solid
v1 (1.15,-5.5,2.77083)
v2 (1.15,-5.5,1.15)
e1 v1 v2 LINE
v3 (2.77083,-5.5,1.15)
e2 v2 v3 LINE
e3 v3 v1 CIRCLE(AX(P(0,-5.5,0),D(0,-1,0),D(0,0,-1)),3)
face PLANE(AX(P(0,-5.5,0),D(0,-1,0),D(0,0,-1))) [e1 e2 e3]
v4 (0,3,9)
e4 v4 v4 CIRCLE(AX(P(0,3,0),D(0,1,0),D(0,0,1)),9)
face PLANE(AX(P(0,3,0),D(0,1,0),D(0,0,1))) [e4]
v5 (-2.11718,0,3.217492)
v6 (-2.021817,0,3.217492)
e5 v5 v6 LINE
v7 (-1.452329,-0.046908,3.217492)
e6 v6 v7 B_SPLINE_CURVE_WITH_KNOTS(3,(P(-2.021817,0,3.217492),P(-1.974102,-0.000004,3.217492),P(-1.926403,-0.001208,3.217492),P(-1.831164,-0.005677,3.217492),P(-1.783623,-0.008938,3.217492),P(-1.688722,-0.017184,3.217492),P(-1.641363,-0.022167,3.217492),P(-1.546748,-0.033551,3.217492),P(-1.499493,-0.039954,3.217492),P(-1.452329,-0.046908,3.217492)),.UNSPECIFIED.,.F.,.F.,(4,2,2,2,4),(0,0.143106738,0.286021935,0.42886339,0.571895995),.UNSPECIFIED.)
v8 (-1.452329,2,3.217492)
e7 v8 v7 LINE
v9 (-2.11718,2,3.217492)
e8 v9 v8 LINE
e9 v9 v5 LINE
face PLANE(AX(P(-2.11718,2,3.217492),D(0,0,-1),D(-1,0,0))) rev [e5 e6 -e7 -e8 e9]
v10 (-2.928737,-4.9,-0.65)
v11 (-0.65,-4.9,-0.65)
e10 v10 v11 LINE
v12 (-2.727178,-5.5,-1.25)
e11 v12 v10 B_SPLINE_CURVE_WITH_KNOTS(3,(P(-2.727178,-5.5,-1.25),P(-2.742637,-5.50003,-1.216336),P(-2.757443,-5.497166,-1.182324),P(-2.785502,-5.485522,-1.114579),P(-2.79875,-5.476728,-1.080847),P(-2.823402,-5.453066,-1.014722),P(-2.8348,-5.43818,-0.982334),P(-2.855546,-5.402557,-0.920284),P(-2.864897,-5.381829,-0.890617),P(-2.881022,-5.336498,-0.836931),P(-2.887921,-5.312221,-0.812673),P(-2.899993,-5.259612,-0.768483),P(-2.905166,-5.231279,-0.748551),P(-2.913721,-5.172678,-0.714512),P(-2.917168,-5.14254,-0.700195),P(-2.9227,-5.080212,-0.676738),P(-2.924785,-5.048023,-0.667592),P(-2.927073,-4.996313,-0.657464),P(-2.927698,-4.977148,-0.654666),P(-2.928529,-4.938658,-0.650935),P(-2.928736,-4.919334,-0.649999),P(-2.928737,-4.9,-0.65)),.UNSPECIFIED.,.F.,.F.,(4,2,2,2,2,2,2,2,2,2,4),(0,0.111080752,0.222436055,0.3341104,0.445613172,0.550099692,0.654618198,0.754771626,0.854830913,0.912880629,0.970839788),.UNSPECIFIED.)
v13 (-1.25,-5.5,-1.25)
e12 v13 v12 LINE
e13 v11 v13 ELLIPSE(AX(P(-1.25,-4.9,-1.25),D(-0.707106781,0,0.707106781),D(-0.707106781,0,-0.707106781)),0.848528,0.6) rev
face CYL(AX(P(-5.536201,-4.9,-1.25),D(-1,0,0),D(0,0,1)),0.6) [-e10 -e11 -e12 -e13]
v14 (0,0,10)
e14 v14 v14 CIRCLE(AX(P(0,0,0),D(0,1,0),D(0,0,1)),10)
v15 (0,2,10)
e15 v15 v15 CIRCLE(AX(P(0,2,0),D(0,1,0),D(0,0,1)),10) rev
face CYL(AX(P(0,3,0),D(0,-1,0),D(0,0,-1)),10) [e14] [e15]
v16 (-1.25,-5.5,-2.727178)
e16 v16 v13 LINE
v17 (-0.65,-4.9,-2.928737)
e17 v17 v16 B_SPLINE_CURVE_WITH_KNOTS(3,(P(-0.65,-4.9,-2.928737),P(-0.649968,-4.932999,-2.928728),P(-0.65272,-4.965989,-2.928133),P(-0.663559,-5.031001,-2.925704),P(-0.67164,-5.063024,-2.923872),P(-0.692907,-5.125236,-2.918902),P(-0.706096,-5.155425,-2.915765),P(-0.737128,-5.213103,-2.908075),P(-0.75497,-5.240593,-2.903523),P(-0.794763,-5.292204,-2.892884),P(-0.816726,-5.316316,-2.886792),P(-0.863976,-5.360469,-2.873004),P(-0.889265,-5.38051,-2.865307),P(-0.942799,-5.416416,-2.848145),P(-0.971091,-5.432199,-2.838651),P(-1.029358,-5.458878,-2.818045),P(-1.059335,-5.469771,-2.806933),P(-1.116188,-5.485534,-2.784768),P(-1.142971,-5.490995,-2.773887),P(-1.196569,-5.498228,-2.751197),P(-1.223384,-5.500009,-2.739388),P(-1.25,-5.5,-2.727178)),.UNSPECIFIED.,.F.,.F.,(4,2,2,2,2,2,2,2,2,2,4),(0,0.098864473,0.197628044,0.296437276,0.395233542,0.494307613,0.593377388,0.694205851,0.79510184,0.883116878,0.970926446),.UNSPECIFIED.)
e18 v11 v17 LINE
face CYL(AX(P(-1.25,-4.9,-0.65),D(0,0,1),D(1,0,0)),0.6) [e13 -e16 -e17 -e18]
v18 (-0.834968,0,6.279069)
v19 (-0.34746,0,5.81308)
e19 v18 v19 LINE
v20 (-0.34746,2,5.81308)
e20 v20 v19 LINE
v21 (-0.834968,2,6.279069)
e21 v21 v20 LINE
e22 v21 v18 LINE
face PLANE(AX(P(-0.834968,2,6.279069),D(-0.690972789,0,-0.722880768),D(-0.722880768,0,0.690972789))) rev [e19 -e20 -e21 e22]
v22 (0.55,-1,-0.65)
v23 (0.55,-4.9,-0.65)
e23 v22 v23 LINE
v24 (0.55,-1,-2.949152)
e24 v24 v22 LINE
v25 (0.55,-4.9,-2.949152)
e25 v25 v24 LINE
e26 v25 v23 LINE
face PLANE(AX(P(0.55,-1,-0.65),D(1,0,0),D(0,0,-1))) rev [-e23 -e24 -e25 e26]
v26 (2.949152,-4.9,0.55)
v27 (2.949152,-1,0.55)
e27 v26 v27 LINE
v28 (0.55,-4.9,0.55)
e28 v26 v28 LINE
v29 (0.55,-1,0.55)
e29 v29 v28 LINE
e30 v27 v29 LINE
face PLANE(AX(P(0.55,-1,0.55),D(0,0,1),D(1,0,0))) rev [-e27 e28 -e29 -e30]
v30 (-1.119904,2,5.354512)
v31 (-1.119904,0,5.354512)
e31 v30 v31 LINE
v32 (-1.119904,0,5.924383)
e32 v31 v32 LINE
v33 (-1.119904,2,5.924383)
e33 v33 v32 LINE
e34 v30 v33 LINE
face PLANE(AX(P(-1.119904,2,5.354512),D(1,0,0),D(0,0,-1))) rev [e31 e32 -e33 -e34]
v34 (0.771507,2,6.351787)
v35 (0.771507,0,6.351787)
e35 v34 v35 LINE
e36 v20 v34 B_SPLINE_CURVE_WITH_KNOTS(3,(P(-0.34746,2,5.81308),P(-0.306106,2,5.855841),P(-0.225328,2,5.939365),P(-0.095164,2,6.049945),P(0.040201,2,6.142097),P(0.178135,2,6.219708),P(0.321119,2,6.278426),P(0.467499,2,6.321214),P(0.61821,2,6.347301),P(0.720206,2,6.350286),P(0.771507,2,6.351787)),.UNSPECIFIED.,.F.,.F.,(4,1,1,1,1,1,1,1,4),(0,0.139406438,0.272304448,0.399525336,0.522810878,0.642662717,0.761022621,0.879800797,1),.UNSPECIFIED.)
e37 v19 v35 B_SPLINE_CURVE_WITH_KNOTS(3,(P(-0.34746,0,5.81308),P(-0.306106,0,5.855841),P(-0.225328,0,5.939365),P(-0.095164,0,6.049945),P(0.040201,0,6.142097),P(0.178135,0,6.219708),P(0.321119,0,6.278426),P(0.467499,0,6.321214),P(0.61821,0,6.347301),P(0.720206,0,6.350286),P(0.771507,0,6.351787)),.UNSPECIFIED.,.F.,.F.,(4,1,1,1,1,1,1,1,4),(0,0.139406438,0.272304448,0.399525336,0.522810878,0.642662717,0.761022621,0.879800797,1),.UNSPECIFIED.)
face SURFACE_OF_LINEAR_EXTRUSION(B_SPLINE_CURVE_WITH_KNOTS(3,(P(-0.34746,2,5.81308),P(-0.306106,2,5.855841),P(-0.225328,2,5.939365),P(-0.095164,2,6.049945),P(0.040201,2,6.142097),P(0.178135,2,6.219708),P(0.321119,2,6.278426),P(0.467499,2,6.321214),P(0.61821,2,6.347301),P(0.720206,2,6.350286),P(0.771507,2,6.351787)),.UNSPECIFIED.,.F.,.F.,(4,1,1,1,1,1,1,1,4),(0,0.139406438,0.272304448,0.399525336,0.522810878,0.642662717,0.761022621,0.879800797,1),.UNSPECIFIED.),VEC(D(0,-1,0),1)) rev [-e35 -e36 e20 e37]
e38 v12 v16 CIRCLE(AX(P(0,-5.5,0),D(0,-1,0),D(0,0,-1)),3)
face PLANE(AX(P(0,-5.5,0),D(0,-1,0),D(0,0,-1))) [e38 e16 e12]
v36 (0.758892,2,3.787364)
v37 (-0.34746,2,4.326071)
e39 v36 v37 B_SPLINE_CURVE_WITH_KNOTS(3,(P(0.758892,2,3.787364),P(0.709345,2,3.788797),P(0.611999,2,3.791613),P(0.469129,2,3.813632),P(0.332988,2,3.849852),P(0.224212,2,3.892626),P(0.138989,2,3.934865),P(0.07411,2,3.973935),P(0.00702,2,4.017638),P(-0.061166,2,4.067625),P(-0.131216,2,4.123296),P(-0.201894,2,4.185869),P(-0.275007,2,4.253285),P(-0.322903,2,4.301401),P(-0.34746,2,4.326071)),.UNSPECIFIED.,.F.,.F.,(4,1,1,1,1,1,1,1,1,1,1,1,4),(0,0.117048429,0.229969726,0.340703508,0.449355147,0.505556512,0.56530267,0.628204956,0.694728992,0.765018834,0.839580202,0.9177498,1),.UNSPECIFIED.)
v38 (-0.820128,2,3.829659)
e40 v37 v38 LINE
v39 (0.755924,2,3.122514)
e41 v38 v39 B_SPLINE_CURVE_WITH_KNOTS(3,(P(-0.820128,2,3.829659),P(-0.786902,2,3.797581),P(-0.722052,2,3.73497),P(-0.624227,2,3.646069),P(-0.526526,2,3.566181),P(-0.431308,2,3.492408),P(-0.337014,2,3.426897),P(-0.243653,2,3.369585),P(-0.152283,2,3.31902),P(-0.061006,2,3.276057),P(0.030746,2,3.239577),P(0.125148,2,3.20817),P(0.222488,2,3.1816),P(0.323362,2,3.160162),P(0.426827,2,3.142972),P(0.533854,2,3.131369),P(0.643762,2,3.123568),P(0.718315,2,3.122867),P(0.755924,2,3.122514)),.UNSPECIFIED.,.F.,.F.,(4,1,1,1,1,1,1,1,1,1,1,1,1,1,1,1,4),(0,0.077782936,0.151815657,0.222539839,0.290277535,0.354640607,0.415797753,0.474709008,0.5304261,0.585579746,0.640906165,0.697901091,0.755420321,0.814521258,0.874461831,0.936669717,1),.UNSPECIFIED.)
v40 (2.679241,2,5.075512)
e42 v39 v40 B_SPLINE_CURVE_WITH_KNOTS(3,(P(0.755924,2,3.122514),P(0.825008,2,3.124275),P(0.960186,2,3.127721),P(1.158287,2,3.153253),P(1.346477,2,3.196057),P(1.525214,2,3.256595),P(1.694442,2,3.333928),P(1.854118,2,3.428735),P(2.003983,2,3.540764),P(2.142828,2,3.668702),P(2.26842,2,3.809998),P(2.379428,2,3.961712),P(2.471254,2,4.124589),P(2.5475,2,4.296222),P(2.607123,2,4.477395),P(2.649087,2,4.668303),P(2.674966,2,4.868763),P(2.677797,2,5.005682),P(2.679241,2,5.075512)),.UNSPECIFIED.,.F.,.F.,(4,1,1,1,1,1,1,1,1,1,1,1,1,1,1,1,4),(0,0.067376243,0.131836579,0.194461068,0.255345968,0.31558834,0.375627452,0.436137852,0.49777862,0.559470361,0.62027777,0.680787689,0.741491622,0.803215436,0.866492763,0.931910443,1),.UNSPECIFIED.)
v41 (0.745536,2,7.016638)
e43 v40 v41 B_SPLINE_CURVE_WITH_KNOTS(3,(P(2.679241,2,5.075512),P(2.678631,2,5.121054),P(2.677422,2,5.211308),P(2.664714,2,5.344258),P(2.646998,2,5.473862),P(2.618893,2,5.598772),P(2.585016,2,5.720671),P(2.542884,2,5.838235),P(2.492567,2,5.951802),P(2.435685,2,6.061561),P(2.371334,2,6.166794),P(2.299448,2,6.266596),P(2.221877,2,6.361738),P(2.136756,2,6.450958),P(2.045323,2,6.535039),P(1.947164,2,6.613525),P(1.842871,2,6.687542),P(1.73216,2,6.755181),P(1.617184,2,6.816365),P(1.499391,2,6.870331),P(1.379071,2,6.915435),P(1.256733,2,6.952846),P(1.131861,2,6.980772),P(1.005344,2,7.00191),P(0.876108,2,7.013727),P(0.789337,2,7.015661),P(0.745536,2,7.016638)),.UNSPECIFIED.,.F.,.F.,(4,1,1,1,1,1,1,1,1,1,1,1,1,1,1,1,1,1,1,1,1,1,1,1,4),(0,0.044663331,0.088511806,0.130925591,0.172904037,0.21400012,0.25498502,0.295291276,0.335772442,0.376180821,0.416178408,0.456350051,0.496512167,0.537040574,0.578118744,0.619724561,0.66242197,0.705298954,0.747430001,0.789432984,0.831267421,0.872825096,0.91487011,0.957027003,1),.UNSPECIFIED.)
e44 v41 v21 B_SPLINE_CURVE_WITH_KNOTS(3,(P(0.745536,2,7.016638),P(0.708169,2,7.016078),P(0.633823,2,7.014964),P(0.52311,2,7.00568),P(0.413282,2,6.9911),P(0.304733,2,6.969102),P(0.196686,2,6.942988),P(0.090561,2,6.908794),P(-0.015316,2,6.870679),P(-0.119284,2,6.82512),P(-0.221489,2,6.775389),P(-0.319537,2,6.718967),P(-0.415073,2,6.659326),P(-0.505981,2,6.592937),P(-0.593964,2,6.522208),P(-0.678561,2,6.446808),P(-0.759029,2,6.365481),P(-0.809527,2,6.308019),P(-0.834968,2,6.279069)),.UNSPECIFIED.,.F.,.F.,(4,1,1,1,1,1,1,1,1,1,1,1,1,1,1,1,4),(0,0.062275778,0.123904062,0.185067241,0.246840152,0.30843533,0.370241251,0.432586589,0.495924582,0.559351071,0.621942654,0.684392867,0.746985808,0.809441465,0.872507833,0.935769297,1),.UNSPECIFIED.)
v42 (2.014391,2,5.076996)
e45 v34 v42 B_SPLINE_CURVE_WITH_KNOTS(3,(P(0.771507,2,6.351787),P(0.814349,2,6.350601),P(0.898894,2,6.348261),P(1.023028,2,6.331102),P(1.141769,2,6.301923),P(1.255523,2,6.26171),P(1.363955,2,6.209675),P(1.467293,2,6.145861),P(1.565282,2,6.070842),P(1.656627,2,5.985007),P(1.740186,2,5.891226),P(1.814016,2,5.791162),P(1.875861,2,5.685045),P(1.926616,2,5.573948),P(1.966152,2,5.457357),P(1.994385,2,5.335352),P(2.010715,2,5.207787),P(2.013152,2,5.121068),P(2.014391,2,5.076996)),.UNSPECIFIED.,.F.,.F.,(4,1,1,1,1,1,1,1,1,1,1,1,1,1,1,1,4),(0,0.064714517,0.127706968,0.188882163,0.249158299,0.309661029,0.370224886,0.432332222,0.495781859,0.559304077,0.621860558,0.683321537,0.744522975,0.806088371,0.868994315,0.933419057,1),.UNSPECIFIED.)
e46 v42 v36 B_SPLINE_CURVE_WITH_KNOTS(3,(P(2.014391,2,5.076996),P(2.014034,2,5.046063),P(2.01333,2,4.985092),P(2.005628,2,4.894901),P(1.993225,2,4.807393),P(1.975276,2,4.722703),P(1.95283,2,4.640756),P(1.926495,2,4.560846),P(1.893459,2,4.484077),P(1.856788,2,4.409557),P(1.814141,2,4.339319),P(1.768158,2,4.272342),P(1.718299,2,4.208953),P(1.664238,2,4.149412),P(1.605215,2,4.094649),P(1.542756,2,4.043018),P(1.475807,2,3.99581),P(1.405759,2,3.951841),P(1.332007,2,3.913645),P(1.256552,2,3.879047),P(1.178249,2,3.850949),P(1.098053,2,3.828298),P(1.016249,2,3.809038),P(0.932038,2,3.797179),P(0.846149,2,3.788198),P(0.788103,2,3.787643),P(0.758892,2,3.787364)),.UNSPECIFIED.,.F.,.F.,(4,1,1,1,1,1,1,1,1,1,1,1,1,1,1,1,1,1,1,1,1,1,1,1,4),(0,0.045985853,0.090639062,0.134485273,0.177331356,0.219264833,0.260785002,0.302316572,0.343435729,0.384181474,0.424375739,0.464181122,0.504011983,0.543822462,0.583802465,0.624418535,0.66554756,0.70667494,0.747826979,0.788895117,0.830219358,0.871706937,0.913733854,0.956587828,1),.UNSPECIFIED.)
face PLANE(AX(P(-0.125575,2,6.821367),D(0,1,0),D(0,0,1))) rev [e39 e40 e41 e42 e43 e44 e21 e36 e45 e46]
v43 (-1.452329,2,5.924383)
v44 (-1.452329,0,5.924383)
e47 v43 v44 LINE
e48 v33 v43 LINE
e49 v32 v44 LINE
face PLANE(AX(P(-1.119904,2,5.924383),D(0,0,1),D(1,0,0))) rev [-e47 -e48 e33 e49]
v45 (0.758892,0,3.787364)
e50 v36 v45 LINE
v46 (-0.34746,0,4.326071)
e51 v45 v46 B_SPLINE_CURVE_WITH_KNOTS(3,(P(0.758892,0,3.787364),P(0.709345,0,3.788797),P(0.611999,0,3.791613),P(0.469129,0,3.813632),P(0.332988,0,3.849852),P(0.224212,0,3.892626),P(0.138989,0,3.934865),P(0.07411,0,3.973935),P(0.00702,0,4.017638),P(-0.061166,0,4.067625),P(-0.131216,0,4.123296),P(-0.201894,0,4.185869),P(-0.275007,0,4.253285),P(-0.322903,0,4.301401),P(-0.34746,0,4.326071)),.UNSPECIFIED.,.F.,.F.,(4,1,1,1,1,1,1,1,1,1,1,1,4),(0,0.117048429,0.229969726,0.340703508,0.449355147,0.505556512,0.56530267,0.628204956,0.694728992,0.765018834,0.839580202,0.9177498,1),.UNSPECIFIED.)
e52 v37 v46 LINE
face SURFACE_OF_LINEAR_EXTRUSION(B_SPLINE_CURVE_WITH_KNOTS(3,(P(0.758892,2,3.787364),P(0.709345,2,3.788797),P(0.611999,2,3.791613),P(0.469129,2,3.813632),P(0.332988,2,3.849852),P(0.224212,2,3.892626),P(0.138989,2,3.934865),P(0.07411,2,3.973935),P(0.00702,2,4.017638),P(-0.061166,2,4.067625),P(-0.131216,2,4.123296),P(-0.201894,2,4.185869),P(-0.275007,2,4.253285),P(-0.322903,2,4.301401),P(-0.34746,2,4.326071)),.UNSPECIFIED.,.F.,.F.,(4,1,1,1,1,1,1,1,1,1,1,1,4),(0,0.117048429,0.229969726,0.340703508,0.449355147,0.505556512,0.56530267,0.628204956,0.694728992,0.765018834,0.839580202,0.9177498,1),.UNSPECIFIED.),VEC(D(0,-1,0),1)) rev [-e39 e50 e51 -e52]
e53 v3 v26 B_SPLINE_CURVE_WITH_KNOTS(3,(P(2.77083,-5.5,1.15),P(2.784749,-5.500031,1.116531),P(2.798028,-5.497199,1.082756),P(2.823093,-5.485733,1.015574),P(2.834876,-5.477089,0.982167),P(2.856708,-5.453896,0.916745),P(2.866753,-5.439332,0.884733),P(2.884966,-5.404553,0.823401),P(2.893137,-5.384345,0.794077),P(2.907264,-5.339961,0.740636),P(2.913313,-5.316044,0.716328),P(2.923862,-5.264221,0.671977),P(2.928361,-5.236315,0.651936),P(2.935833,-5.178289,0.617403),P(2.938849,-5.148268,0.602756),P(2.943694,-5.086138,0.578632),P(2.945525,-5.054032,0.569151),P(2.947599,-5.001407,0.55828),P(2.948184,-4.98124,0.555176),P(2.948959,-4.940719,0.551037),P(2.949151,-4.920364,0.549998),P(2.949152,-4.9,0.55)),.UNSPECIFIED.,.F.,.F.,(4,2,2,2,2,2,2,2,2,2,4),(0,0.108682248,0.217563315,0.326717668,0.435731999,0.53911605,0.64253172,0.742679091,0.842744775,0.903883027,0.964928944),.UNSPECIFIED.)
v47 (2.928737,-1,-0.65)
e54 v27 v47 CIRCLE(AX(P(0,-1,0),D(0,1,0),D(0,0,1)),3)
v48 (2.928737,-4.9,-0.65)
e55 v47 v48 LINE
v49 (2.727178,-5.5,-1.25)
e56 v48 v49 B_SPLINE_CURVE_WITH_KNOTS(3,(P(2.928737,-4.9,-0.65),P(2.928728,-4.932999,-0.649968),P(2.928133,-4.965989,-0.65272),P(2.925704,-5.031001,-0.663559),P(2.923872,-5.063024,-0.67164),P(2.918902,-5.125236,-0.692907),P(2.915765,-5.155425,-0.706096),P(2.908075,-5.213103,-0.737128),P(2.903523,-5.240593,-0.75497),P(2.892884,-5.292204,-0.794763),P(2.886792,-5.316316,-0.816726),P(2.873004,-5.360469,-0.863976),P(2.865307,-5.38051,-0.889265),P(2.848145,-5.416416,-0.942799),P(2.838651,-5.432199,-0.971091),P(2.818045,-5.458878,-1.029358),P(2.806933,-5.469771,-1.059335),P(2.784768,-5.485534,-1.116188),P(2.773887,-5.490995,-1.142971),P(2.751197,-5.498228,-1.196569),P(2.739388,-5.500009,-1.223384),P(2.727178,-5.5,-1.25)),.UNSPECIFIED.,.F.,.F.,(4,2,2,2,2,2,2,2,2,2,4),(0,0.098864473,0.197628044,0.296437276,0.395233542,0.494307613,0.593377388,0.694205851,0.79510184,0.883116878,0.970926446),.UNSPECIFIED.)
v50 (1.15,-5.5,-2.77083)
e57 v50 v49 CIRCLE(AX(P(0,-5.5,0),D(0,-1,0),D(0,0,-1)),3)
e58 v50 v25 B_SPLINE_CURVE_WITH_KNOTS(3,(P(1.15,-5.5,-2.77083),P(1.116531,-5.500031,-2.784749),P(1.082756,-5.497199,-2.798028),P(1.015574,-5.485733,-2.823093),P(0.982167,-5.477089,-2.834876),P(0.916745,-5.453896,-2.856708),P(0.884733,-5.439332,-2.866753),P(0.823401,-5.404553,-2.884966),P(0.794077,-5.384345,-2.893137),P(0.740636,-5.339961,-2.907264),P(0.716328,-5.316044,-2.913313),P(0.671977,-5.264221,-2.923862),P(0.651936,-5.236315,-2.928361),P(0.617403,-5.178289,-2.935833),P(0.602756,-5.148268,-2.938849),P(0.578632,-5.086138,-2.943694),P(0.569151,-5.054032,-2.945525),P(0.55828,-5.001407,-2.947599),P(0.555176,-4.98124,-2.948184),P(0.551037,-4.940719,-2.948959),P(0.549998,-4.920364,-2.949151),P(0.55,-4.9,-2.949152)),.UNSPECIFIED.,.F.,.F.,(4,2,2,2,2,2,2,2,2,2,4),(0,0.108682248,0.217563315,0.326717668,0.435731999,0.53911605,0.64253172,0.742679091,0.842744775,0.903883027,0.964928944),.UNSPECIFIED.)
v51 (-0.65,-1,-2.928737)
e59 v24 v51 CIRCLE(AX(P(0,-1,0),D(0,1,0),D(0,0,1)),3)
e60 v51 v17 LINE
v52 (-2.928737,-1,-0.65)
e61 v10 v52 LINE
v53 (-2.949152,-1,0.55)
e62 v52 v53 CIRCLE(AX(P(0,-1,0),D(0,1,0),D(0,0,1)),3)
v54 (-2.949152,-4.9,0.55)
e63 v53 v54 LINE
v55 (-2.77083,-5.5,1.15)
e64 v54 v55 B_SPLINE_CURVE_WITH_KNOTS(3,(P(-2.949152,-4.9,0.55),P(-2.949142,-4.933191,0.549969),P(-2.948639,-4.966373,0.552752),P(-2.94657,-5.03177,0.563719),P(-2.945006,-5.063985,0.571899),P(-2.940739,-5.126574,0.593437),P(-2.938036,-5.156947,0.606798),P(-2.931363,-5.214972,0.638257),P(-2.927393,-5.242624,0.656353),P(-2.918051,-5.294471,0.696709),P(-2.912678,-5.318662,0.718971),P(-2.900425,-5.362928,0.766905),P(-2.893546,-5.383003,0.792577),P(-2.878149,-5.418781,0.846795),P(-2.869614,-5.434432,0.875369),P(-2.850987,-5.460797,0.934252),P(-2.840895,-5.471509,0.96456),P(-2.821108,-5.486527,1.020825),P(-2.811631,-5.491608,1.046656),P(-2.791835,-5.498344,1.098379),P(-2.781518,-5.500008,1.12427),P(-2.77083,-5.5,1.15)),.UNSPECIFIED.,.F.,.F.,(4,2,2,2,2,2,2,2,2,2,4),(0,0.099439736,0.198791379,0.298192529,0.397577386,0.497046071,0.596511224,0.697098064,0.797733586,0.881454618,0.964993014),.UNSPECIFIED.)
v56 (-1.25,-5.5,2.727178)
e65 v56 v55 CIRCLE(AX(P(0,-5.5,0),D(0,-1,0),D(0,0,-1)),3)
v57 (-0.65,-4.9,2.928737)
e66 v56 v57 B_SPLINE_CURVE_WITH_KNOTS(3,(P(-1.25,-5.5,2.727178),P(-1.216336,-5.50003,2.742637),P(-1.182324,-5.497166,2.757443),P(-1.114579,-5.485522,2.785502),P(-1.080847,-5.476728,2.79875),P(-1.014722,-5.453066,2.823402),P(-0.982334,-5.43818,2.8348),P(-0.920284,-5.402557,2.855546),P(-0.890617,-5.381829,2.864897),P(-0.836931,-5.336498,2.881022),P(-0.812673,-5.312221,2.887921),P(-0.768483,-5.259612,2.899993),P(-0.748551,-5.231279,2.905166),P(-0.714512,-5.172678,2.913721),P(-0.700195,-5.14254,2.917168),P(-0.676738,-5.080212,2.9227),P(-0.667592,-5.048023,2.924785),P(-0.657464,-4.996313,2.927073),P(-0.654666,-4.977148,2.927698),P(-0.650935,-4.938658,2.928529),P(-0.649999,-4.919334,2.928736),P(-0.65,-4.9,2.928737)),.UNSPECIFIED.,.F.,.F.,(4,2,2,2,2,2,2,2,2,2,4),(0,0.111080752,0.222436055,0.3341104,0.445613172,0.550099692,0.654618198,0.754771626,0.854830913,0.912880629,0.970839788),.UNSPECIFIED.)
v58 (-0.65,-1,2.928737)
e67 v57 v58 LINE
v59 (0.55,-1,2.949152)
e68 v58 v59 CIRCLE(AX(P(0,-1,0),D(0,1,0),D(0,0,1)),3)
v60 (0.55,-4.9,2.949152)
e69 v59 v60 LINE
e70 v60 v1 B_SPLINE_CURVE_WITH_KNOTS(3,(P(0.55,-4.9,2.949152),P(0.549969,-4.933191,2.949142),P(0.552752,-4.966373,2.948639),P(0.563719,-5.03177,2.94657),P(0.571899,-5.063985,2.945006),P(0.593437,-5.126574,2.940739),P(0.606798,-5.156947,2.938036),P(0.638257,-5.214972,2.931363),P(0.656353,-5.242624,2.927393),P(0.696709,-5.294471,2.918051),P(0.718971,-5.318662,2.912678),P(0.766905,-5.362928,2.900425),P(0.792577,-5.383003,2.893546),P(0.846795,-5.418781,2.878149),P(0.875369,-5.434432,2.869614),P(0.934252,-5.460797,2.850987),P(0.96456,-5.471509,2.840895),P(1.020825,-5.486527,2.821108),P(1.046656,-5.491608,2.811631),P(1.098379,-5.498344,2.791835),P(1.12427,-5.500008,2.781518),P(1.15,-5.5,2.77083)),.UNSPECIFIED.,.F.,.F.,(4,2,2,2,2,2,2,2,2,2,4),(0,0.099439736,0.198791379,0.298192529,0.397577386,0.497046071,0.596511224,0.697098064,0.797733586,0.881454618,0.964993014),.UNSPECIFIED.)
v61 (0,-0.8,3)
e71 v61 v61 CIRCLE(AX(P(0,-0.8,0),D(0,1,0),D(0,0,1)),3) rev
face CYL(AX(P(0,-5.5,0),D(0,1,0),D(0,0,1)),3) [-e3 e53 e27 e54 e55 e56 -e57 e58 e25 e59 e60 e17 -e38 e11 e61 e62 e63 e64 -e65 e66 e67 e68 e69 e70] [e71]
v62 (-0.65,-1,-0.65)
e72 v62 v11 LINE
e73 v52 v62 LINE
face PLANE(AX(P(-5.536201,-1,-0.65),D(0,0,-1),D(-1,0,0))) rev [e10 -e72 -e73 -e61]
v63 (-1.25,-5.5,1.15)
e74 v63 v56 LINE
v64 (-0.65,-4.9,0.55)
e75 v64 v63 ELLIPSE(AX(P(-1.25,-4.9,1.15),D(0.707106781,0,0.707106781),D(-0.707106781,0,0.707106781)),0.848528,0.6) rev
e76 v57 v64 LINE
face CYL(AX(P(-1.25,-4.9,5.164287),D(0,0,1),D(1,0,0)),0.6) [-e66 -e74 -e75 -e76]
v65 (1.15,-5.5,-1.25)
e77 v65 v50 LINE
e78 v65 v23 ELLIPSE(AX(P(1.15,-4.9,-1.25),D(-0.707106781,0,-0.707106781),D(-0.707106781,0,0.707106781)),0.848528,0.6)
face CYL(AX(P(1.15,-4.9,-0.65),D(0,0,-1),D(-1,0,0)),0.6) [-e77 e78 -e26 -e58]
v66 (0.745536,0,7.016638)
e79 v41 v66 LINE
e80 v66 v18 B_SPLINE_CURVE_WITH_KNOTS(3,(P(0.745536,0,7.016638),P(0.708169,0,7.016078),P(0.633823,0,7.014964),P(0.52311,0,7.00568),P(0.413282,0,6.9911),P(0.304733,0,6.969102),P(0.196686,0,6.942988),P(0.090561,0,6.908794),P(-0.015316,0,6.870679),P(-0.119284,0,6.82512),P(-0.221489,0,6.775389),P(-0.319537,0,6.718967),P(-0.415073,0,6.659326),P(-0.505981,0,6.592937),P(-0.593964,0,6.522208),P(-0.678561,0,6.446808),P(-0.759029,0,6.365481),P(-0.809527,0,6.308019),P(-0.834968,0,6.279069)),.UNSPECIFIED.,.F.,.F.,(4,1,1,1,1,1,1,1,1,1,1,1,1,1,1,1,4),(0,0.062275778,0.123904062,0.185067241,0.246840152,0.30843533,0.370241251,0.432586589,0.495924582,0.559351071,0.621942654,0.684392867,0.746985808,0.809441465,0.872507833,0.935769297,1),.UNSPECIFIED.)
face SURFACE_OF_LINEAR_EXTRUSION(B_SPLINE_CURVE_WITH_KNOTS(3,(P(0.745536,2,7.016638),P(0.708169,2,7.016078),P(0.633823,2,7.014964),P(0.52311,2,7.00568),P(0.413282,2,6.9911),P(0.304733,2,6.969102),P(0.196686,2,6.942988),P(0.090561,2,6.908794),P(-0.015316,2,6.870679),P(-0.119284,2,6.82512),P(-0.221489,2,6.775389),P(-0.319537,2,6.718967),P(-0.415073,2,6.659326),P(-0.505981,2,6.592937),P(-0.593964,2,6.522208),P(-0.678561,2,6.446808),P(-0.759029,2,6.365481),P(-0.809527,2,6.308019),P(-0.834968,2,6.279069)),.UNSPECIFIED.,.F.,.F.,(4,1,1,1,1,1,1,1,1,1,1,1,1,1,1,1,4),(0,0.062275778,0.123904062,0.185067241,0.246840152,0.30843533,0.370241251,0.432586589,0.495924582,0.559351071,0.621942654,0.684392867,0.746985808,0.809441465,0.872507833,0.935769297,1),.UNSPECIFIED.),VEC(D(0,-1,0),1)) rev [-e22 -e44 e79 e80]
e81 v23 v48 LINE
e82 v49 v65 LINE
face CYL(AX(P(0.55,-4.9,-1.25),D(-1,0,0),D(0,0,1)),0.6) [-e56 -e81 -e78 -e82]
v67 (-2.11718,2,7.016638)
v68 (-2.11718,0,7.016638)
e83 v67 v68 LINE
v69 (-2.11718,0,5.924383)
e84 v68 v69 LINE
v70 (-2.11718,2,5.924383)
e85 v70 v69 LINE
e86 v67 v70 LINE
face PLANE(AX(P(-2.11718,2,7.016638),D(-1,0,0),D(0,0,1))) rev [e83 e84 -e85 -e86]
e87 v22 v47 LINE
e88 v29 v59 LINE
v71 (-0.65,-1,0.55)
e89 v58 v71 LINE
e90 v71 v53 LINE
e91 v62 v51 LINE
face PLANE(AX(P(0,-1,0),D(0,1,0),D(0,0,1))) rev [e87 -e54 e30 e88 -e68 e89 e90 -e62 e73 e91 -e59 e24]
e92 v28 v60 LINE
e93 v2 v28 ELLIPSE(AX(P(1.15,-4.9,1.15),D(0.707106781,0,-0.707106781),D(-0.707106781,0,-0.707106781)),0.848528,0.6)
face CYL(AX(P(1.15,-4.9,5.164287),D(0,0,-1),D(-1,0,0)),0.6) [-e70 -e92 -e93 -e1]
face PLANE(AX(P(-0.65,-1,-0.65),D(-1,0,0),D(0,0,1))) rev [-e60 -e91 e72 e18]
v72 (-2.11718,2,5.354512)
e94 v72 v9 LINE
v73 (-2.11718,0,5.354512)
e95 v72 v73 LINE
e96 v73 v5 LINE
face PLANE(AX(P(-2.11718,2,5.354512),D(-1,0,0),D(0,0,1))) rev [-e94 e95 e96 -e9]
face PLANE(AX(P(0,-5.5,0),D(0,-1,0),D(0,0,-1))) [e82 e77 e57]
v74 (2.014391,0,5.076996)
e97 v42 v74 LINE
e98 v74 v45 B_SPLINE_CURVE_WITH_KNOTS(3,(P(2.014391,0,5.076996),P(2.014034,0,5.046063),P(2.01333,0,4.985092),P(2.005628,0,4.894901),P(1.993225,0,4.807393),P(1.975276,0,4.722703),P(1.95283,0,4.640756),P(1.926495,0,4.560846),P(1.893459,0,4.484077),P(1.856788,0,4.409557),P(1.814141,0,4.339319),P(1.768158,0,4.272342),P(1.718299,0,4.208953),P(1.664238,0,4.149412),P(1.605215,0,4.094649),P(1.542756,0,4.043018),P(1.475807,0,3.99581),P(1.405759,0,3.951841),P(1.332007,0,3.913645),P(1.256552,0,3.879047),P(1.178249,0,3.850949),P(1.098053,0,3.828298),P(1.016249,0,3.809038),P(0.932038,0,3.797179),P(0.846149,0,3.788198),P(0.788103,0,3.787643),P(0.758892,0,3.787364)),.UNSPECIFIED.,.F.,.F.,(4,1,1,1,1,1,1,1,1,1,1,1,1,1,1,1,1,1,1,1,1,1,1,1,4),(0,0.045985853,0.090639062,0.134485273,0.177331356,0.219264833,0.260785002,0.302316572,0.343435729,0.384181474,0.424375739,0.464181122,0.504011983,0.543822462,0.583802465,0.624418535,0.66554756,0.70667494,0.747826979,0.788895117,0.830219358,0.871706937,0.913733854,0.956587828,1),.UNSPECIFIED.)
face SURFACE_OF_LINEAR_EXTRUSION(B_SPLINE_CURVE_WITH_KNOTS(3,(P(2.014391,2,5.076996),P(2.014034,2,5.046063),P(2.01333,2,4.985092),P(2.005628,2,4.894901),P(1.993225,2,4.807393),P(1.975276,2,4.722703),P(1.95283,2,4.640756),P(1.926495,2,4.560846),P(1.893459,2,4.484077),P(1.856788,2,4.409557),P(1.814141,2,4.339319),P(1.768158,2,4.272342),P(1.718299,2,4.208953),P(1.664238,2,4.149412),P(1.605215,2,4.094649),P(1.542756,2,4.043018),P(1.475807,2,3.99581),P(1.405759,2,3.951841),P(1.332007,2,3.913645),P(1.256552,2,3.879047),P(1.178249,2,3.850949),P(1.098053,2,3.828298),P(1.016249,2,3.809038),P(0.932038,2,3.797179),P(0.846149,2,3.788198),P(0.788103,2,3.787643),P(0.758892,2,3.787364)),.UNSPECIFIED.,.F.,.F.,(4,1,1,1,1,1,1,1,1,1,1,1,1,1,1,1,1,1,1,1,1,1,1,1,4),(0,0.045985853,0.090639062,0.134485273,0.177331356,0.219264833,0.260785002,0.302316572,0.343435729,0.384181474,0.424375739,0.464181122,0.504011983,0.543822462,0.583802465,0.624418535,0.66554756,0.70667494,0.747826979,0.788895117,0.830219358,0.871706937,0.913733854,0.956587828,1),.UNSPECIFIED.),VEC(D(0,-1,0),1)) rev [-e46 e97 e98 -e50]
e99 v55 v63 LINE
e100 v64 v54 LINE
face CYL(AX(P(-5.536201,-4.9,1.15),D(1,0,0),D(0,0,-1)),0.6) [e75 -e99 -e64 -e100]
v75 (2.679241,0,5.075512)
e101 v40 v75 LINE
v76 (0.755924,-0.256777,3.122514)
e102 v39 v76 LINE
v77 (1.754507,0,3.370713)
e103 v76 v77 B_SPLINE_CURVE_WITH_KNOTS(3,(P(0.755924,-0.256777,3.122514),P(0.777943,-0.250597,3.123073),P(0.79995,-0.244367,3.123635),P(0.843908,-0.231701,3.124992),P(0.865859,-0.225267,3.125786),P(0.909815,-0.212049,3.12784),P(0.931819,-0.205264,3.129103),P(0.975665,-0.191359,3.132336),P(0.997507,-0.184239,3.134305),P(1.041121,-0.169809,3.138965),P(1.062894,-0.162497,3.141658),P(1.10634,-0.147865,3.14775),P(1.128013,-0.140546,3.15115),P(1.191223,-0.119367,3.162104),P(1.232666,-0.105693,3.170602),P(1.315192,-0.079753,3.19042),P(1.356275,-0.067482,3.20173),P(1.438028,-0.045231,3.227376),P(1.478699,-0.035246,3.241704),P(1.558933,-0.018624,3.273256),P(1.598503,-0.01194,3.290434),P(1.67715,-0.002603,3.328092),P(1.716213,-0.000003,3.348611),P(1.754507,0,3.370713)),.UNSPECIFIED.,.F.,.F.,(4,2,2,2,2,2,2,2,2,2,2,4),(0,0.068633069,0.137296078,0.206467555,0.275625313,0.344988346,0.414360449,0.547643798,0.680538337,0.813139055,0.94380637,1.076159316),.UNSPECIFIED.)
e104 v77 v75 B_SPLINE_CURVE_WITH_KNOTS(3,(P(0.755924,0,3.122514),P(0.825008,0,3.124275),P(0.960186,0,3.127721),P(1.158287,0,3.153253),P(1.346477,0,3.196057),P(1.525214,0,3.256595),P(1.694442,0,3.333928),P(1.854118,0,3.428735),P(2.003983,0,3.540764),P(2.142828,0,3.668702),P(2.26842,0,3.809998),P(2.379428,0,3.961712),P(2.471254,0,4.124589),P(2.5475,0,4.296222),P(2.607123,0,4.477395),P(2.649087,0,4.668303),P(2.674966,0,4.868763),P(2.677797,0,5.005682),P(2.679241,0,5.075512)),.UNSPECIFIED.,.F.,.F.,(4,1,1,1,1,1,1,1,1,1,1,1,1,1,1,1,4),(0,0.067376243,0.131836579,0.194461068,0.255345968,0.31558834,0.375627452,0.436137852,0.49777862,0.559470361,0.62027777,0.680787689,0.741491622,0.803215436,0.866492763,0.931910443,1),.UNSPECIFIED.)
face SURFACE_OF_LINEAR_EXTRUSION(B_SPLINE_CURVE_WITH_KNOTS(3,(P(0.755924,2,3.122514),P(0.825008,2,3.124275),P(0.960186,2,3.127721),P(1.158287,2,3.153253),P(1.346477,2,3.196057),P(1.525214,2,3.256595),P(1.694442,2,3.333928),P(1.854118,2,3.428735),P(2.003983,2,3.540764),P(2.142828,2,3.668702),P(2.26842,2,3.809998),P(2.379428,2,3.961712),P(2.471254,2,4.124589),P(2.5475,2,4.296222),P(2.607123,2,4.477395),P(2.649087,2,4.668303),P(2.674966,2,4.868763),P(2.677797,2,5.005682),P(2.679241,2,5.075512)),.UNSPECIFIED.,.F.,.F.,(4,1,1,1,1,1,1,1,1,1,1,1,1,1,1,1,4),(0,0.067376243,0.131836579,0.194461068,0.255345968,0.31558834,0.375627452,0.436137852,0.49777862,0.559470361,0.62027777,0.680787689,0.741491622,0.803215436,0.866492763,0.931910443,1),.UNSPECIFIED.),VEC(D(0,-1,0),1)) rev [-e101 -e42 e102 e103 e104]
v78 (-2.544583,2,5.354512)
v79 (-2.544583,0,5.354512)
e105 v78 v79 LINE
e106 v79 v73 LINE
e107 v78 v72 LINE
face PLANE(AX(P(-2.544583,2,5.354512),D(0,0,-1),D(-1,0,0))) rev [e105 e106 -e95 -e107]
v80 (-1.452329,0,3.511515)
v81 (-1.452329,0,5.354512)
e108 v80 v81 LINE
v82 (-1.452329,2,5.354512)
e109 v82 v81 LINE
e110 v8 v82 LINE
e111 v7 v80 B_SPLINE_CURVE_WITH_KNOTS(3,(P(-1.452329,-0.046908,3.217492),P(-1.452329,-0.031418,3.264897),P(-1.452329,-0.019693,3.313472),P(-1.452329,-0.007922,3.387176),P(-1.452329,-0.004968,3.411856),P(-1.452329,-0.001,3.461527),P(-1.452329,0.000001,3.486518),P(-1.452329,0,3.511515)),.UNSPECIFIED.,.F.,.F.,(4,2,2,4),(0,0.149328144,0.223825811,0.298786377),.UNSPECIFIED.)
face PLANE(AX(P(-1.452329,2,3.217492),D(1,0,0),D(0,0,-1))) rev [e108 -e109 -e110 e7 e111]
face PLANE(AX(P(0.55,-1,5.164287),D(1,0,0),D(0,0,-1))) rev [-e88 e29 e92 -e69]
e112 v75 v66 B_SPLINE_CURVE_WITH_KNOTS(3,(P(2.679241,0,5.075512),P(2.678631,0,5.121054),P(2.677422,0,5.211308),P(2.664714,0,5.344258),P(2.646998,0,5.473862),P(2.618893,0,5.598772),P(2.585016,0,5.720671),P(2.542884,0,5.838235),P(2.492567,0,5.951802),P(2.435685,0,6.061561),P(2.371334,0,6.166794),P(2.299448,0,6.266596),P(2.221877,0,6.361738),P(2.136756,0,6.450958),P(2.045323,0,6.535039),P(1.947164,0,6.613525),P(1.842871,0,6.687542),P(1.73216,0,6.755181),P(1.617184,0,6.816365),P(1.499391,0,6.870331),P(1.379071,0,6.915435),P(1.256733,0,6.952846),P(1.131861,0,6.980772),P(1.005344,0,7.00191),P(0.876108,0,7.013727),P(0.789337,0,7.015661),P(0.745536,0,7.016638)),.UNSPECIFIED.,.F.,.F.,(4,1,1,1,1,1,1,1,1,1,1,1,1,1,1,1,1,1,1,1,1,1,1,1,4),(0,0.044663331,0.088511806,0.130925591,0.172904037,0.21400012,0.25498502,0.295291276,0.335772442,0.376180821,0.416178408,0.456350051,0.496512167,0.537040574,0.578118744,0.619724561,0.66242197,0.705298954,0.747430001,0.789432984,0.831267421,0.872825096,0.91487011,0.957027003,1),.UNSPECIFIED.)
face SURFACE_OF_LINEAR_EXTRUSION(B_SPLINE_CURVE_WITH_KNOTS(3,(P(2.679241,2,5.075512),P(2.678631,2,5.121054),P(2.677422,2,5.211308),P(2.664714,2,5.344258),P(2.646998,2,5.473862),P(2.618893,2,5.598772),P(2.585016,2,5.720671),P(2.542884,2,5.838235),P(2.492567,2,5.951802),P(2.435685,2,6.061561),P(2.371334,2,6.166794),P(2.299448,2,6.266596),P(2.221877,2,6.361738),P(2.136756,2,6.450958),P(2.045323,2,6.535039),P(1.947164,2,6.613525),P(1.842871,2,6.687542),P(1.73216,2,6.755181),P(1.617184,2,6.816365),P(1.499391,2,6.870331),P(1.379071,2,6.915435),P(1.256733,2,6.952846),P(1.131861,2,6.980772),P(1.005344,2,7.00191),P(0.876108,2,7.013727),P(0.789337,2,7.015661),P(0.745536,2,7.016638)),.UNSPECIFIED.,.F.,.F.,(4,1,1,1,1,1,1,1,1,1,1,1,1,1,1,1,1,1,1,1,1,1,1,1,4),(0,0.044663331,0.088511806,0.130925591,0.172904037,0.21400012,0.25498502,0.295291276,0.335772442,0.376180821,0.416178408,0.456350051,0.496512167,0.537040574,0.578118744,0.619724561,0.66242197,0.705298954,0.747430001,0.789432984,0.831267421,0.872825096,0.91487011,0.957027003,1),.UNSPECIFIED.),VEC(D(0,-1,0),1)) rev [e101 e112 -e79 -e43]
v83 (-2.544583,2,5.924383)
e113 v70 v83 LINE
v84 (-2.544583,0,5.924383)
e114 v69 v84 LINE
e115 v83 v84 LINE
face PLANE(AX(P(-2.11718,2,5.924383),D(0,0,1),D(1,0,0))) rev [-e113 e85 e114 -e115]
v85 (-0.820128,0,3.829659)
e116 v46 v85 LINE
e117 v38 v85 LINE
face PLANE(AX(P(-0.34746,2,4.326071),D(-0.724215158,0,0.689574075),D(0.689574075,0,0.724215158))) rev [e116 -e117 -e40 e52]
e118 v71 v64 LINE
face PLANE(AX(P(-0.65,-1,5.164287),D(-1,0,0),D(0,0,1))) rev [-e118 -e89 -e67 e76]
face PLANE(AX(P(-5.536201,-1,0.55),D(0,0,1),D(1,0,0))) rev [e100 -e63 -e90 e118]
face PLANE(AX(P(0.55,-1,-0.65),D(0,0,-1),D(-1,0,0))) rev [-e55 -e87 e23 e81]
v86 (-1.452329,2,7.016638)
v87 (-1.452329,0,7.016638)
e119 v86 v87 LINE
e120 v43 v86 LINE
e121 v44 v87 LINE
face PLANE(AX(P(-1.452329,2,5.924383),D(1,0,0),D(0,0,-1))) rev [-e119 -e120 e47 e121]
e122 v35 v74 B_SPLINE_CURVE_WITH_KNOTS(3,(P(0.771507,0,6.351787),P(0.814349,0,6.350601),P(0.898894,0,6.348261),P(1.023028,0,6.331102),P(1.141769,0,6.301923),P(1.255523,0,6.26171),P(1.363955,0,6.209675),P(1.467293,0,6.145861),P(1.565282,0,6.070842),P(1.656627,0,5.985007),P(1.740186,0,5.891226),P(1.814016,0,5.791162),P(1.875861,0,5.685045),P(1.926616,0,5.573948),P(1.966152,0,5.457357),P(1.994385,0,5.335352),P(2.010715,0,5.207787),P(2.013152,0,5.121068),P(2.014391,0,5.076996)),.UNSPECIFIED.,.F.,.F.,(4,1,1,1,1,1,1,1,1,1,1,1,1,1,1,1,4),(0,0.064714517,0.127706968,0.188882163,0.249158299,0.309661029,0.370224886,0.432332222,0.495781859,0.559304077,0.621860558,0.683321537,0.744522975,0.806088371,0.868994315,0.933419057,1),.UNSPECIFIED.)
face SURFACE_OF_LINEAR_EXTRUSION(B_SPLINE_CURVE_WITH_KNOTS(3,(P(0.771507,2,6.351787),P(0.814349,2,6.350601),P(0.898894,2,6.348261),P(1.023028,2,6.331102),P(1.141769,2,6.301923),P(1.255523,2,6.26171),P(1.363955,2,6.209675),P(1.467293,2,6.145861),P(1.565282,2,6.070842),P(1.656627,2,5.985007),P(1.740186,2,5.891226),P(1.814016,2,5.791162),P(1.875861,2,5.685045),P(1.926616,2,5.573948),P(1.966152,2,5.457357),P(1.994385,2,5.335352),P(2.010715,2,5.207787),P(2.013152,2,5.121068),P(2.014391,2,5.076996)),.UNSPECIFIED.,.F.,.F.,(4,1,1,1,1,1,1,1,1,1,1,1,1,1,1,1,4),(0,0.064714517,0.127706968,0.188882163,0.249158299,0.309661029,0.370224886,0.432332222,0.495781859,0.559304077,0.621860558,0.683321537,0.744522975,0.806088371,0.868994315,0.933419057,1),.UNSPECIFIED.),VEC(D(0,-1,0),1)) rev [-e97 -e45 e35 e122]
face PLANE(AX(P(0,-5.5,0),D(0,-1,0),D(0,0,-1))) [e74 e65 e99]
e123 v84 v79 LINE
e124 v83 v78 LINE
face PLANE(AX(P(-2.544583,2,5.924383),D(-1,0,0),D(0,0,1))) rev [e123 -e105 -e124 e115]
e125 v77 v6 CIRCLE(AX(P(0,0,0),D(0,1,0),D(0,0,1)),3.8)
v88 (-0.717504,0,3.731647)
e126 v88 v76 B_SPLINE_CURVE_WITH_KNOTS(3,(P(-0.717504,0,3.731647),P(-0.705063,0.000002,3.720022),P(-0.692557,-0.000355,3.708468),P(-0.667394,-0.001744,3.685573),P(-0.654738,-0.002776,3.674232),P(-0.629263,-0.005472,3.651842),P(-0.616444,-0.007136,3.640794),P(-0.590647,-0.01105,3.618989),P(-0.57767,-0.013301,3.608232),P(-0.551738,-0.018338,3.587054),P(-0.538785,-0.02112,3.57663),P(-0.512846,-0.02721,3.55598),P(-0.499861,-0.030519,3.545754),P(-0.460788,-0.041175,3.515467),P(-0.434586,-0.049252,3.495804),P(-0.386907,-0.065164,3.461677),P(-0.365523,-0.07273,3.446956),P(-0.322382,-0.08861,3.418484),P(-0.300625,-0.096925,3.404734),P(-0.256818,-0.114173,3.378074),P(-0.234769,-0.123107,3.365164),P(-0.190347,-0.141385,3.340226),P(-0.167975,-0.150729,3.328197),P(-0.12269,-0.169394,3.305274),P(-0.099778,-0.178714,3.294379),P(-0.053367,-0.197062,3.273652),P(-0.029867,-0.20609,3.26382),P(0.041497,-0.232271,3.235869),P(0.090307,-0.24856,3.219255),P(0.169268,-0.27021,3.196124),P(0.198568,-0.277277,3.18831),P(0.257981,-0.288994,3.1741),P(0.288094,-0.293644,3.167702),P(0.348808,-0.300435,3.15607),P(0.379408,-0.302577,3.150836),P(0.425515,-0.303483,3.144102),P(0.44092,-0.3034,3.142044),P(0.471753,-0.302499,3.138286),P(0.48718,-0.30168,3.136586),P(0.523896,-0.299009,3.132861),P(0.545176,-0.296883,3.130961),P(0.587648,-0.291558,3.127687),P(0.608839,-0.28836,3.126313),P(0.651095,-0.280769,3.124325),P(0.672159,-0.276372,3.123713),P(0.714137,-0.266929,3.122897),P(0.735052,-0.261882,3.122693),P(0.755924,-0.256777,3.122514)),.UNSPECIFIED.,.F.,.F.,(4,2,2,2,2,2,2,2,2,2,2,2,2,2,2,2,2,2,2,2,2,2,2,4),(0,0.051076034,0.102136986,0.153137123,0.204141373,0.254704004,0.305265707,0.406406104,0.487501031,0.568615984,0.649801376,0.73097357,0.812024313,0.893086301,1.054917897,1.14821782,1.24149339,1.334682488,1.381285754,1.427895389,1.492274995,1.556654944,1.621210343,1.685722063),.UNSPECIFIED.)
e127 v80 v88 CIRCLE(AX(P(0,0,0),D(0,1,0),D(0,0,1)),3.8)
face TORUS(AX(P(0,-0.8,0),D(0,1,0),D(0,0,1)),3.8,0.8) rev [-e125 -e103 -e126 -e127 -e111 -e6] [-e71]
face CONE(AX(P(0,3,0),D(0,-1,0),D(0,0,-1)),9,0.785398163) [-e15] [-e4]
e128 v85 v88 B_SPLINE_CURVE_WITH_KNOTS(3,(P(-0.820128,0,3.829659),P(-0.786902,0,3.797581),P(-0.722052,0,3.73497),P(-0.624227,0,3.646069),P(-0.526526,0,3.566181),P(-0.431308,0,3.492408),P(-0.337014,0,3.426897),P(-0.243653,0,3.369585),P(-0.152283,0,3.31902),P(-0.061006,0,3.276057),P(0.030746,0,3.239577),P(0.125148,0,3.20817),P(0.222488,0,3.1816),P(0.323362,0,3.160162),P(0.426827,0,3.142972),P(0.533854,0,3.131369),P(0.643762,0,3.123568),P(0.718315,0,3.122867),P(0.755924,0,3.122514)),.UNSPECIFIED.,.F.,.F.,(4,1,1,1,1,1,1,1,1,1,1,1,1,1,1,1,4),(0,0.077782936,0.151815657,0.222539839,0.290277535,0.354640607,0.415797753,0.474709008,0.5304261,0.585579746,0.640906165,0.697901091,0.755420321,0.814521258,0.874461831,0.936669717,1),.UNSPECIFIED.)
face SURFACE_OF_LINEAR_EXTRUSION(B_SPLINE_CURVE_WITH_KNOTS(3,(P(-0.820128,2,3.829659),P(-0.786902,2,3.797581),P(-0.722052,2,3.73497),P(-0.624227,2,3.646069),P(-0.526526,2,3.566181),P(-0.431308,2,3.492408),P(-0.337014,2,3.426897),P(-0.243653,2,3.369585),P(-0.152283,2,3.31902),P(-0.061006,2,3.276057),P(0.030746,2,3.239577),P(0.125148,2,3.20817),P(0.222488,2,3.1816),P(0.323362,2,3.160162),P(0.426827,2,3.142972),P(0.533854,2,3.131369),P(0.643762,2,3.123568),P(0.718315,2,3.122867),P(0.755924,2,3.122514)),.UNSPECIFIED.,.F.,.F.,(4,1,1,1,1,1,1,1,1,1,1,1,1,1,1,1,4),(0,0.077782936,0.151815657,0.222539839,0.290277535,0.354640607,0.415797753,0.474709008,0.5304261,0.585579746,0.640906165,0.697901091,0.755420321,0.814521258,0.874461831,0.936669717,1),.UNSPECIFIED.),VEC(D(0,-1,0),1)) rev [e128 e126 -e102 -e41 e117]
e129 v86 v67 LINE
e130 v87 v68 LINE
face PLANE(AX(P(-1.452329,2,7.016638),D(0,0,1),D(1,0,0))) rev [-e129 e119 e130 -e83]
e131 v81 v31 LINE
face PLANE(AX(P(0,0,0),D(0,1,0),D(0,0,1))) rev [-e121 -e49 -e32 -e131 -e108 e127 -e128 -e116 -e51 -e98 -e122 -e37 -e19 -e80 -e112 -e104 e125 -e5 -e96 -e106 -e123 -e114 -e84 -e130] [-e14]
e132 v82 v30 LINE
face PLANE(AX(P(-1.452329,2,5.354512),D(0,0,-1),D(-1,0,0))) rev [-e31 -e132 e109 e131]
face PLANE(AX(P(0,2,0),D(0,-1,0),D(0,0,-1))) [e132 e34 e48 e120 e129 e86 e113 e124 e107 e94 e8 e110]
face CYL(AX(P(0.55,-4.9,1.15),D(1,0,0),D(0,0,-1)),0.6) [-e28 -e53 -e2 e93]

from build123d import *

# Parameters (mm, degrees)
SKETCH1_R           = 10
BOSS_EXTRUDE1_DEPTH = 3
SKETCH2_R           = 3
BOSS_EXTRUDE2_DEPTH = 5.5
CUT_EXTRUDE1_DEPTH  = 4.5
CUT_EXTRUDE2_DEPTH  = 2
FILLET3_R           = 0.6
CHAMFER1_SIZE       = 1
FILLET4_START       = -0.303359817
FILLET4_2_DEPTH     = 0.303359817


with BuildPart() as part:
    # Sketch1 → Boss-Extrude1 (new body)
    with BuildSketch(Plane(origin=(0, 0, 0), x_dir=(1, 0, 0), z_dir=(0, 1, 0))):
        with Locations(Location((0, 0, 0), (0, 0, 270))):
            Circle(SKETCH1_R)
    extrude(amount=BOSS_EXTRUDE1_DEPTH)

    # Sketch2 → Boss-Extrude2 (add)
    with BuildSketch(Plane.XZ):
        with Locations(Location((0, 0, 0), (0, 0, 90))):
            Circle(SKETCH2_R)
    extrude(amount=BOSS_EXTRUDE2_DEPTH)

    # Sketch3 → Cut-Extrude1 (cut)
    with BuildSketch(Plane.XZ.offset(5.5)):
        Polygon((0.55, 0.55), (5.536201487, 0.55), (5.536201487, -0.65), (0.55, -0.65), (0.55, -5.164287365), (-0.65, -5.164287365), (-0.65, -0.65), (-5.536201487, -0.65), (-5.536201487, 0.55), (-0.65, 0.55), (-0.65, 5.164287365), (0.55, 5.164287365), align=None)
    extrude(amount=-CUT_EXTRUDE1_DEPTH, mode=Mode.SUBTRACT)

    # Sketch4 → Cut-Extrude2 (cut)
    with BuildSketch(Plane.XZ):
        with BuildLine():
            Line((-0.834967988, 6.279069136), (-0.347460476, 5.81308022))
            add(Edge.make_bspline(
                [(-0.347460476, 5.81308022), (-0.306106117, 5.855840696), (-0.225328099, 5.939365303), (-0.095164312, 6.049944522), (0.040201287, 6.142097338), (0.178135431, 6.219707854), (0.321119155, 6.27842574), (0.467499177, 6.321214453), (0.618210178, 6.347301114), (0.720205587, 6.350285889), (0.771506538, 6.351787151)],
                knots=[0, 0, 0, 0, 1.115251505, 2.178435587, 3.19620269, 4.182487026, 5.141301733, 6.088180966, 7.038406374, 8, 8, 8, 8], degree=3))
            add(Edge.make_bspline(
                [(0.771506538, 6.351787151), (0.814349066, 6.350601102), (0.898894076, 6.348260564), (1.023028305, 6.331102112), (1.14176911, 6.301923419), (1.255522961, 6.261709774), (1.363955131, 6.209675452), (1.467292962, 6.145860726), (1.565281679, 6.070841933), (1.656626907, 5.985007225), (1.740186311, 5.891226356), (1.814016366, 5.791162393), (1.87586088, 5.685044577), (1.926615666, 5.57394759), (1.966151683, 5.45735722), (1.994385366, 5.335351962), (2.010714974, 5.207786517), (2.013152277, 5.121068477), (2.014390986, 5.076995818)],
                knots=[0, 0, 0, 0, 1.035432265, 2.043311493, 3.022114605, 3.98653278, 4.95457646, 5.923598177, 6.917315552, 7.932509744, 8.948865224, 9.949768934, 10.933144597, 11.912367597, 12.897413939, 13.903909035, 14.934704909, 16, 16, 16, 16], degree=3))
            add(Edge.make_bspline(
                [(2.014390986, 5.076995818), (2.014034004, 5.046062543), (2.013330386, 4.985092421), (2.005628036, 4.89490069), (1.993225435, 4.807393388), (1.9752758, 4.722703065), (1.952829605, 4.64075633), (1.926495106, 4.56084623), (1.893458866, 4.484076944), (1.85678814, 4.409556847), (1.814140509, 4.339319312), (1.768158495, 4.272341994), (1.718298508, 4.208953207), (1.664237603, 4.149412088), (1.605214938, 4.094649132), (1.542756032, 4.04301755), (1.47580729, 3.995809856), (1.405759405, 3.95184132), (1.332007254, 3.91364548), (1.256551903, 3.879047428), (1.178249297, 3.850948665), (1.098052816, 3.828298499), (1.016249056, 3.809037916), (0.932037899, 3.797178583), (0.84614935, 3.788197649), (0.788103108, 3.787643128), (0.758892188, 3.787364074)],
                knots=[0, 0, 0, 0, 1.103660481, 2.175337485, 3.227646561, 4.255952547, 5.262355991, 6.258840057, 7.255597736, 8.242457506, 9.22035537, 10.185017736, 11.140346927, 12.096287581, 13.051739095, 14.01125915, 14.986044842, 15.97314143, 16.960198552, 17.947847494, 18.933482797, 19.925264591, 20.920966487, 21.929612487, 22.958107872, 24, 24, 24, 24], degree=3))
            add(Edge.make_bspline(
                [(0.758892188, 3.787364074), (0.709345449, 3.788797229), (0.611998989, 3.791613005), (0.469129063, 3.813631976), (0.332988257, 3.849851938), (0.224212405, 3.892625607), (0.138989397, 3.934865162), (0.074110382, 3.973934669), (0.007020423, 4.017638203), (-0.061166173, 4.067625182), (-0.131216368, 4.123295742), (-0.201893616, 4.185869172), (-0.275007267, 4.253285019), (-0.322903296, 4.301401034), (-0.347460476, 4.326071005)],
                knots=[0, 0, 0, 0, 1.404581149, 2.759636711, 4.088442092, 5.392261763, 6.066678138, 6.783632037, 7.538459478, 8.336747902, 9.180226004, 10.074962426, 11.012997595, 12, 12, 12, 12], degree=3))
            Line((-0.347460476, 4.326071005), (-0.820127577, 3.829659247))
            add(Edge.make_bspline(
                [(-0.820127577, 3.829659247), (-0.786901624, 3.797580632), (-0.722051669, 3.734970037), (-0.624227313, 3.646068834), (-0.526526072, 3.56618122), (-0.431308206, 3.492407626), (-0.337013946, 3.426897254), (-0.243653292, 3.36958468), (-0.152283128, 3.319020385), (-0.061006122, 3.276057111), (0.030745698, 3.239576829), (0.125147538, 3.208169701), (0.222487994, 3.181600401), (0.323361577, 3.160162465), (0.426827399, 3.142972134), (0.533853763, 3.13136876), (0.64376207, 3.123568198), (0.718314577, 3.122867253), (0.755924106, 3.122513647)],
                knots=[0, 0, 0, 0, 1.244526981, 2.429050516, 3.560637417, 4.644440555, 5.67424972, 6.652764056, 7.595344123, 8.486817594, 9.369275933, 10.254498637, 11.166417451, 12.086725134, 13.032340136, 13.991389299, 14.986715468, 16, 16, 16, 16], degree=3))
            add(Edge.make_bspline(
                [(0.755924106, 3.122513647), (0.825008152, 3.124274737), (0.960186427, 3.127720701), (1.158286664, 3.15325296), (1.346476572, 3.196057342), (1.525213981, 3.256594544), (1.694442057, 3.333927983), (1.854117507, 3.428735148), (2.003982968, 3.540764151), (2.142827823, 3.668701904), (2.268419602, 3.809998412), (2.379428191, 3.961712098), (2.4712545, 4.124588579), (2.547499862, 4.29622165), (2.607122733, 4.477394539), (2.649087127, 4.668303219), (2.674966262, 4.868763357), (2.677797476, 5.005682252), (2.679241414, 5.075511777)],
                knots=[0, 0, 0, 0, 1.078019885, 2.10938526, 3.111377082, 4.085535484, 5.04941344, 6.010039228, 6.978205633, 7.964457913, 8.951525778, 9.924444315, 10.892603023, 11.863865945, 12.85144698, 13.863884204, 14.910567087, 16, 16, 16, 16], degree=3))
            add(Edge.make_bspline(
                [(2.679241414, 5.075511777), (2.678631276, 5.121053998), (2.677422131, 5.211307547), (2.664713911, 5.344258338), (2.646997912, 5.473861578), (2.618893092, 5.598771556), (2.585015503, 5.720671039), (2.54288427, 5.838235123), (2.492566683, 5.951801699), (2.435684595, 6.061560883), (2.371334459, 6.166793637), (2.299448292, 6.266595843), (2.221876725, 6.361737958), (2.136755839, 6.450957744), (2.045322553, 6.535038569), (1.947164056, 6.613524781), (1.842870722, 6.687541963), (1.732160268, 6.755181391), (1.617183502, 6.816364849), (1.499390586, 6.870331271), (1.379070921, 6.915434773), (1.256733231, 6.952846464), (1.13186064, 6.980771646), (1.005344457, 7.001910108), (0.876108181, 7.013726643), (0.789337218, 7.015661085), (0.745535818, 7.016637579)],
                knots=[0, 0, 0, 0, 1.071919942, 2.124283339, 3.142214191, 4.149696895, 5.136002878, 6.119640489, 7.086990633, 8.058538607, 9.028339693, 9.988281803, 10.952401235, 11.916291999, 12.888973767, 13.874849856, 14.873389453, 15.898127285, 16.927174885, 17.938320013, 18.946391617, 19.950418109, 20.947802303, 21.956882652, 22.968648068, 24, 24, 24, 24], degree=3))
            add(Edge.make_bspline(
                [(0.745535818, 7.016637579), (0.708168733, 7.016077828), (0.633823076, 7.014964147), (0.523109917, 7.005680404), (0.41328219, 6.99110038), (0.304733111, 6.969102228), (0.196686228, 6.942987643), (0.090561397, 6.908794195), (-0.015315558, 6.870679153), (-0.119284115, 6.825120403), (-0.221489399, 6.775388913), (-0.319537089, 6.718966731), (-0.415073398, 6.659326016), (-0.505981298, 6.592936968), (-0.59396369, 6.522207642), (-0.678560506, 6.446808046), (-0.75902936, 6.365481048), (-0.809527145, 6.308018722), (-0.834967988, 6.279069136)],
                knots=[0, 0, 0, 0, 0.996412454, 1.982464992, 2.961075852, 3.949442424, 4.934965278, 5.923860011, 6.921385422, 7.934793307, 8.949617135, 9.951082467, 10.950285876, 11.951772932, 12.951063433, 13.960125323, 14.972308753, 16, 16, 16, 16], degree=3))
        make_face()
        Polygon((-1.452329099, 7.016637579), (-2.117179526, 7.016637579), (-2.117179526, 5.924383305), (-2.544583373, 5.924383305), (-2.544583373, 5.35451151), (-2.117179526, 5.35451151), (-2.117179526, 3.217492279), (-1.452329099, 3.217492279), (-1.452329099, 5.35451151), (-1.119903885, 5.35451151), (-1.119903885, 5.924383305), (-1.452329099, 5.924383305), align=None)
    extrude(amount=-CUT_EXTRUDE2_DEPTH, mode=Mode.SUBTRACT)

    # Fillet3
    fillet3_edges = [part.edges().sort_by_distance(p)[0] for p in [
        (1.74957621, -5.5, 0.55),
        (-0.65, -5.5, 1.739368465),
        (-1.789368465, -5.5, -0.65),
        (0.55, -5.5, -1.79957621),
        (0.55, -5.5, 1.74957621),
        (-1.79957621, -5.5, 0.55),
        (-0.65, -5.5, -1.789368465),
        (1.739368465, -5.5, -0.65),
    ]]
    fillet(fillet3_edges, radius=FILLET3_R)

    # Chamfer1
    chamfer1_edges = [part.edges().sort_by_distance(p)[0] for p in [
        (0, 3, -10),
    ]]
    chamfer(chamfer1_edges, length=CHAMFER1_SIZE)

    # Fillet4: read off the stored shape, not the designer's step
    # Fillet4 outline → Fillet4 (revolve)
    with BuildSketch(Plane.XY):
        with BuildLine():
            ThreePointArc((3, -0.8), (3.234314575, -0.234314575), (3.8, 0))
            Line((3.8, 0), (3, 0))
            Line((3, 0), (3, -0.8))
        make_face()
    revolve(axis=Axis((0, 0, 0), (0, 1, 0)))

    # Fillet4 2 outline → Fillet4 2 (cut)
    with BuildSketch(Plane(origin=(0, 0, 0), x_dir=(1, 0, 0), z_dir=(0, 1, 0)).offset(FILLET4_START)):
        with BuildLine():
            Line((-1.452329099, -3.511515369), (-1.452329099, -3.217492279))
            Line((-1.452329099, -3.217492279), (-2.021816864, -3.217492279))
            ThreePointArc((-2.021816864, -3.217492279), (-1.743282805, -3.376531514), (-1.452329099, -3.511515369))
        make_face()
        with BuildLine():
            add(Edge.make_bspline(
                [(-0.717504439, -3.731646738), (-0.686203446, -3.702392774), (-0.623361366, -3.645360773), (-0.526526072, -3.56618122), (-0.431308206, -3.492407626), (-0.337013946, -3.426897254), (-0.243653292, -3.36958468), (-0.152283128, -3.319020385), (-0.061006122, -3.276057111), (0.030745698, -3.239576829), (0.125147538, -3.208169701), (0.222487994, -3.181600401), (0.323361577, -3.160162465), (0.426827399, -3.142972134), (0.533853763, -3.13136876), (0.64376207, -3.123568198), (0.718314577, -3.122867253), (0.755924106, -3.122513647)],
                knots=[0.079666321, 0.079666321, 0.079666321, 0.079666321, 0.151815657, 0.222539839, 0.290277535, 0.354640607, 0.415797753, 0.474709008, 0.5304261, 0.585579746, 0.640906165, 0.697901091, 0.755420321, 0.814521258, 0.874461831, 0.936669717, 1, 1, 1, 1], degree=3))
            ThreePointArc((-0.717504439, -3.731646738), (0.549009685, -3.760131429), (1.754506577, -3.370713081))
            add(Edge.make_bspline(
                [(0.755924106, -3.122513647), (0.825008152, -3.124274737), (0.960186427, -3.127720701), (1.158286664, -3.15325296), (1.346476572, -3.196057342), (1.525213981, -3.256594544), (1.659634947, -3.318021913), (1.73426641, -3.359048476), (1.754506577, -3.370713081)],
                knots=[0, 0, 0, 0, 0.067376243, 0.131836579, 0.194461068, 0.255345968, 0.31558834, 0.33836485, 0.33836485, 0.33836485, 0.33836485], degree=3))
        make_face()
    extrude(amount=FILLET4_2_DEPTH, mode=Mode.SUBTRACT)


solid = part.part
